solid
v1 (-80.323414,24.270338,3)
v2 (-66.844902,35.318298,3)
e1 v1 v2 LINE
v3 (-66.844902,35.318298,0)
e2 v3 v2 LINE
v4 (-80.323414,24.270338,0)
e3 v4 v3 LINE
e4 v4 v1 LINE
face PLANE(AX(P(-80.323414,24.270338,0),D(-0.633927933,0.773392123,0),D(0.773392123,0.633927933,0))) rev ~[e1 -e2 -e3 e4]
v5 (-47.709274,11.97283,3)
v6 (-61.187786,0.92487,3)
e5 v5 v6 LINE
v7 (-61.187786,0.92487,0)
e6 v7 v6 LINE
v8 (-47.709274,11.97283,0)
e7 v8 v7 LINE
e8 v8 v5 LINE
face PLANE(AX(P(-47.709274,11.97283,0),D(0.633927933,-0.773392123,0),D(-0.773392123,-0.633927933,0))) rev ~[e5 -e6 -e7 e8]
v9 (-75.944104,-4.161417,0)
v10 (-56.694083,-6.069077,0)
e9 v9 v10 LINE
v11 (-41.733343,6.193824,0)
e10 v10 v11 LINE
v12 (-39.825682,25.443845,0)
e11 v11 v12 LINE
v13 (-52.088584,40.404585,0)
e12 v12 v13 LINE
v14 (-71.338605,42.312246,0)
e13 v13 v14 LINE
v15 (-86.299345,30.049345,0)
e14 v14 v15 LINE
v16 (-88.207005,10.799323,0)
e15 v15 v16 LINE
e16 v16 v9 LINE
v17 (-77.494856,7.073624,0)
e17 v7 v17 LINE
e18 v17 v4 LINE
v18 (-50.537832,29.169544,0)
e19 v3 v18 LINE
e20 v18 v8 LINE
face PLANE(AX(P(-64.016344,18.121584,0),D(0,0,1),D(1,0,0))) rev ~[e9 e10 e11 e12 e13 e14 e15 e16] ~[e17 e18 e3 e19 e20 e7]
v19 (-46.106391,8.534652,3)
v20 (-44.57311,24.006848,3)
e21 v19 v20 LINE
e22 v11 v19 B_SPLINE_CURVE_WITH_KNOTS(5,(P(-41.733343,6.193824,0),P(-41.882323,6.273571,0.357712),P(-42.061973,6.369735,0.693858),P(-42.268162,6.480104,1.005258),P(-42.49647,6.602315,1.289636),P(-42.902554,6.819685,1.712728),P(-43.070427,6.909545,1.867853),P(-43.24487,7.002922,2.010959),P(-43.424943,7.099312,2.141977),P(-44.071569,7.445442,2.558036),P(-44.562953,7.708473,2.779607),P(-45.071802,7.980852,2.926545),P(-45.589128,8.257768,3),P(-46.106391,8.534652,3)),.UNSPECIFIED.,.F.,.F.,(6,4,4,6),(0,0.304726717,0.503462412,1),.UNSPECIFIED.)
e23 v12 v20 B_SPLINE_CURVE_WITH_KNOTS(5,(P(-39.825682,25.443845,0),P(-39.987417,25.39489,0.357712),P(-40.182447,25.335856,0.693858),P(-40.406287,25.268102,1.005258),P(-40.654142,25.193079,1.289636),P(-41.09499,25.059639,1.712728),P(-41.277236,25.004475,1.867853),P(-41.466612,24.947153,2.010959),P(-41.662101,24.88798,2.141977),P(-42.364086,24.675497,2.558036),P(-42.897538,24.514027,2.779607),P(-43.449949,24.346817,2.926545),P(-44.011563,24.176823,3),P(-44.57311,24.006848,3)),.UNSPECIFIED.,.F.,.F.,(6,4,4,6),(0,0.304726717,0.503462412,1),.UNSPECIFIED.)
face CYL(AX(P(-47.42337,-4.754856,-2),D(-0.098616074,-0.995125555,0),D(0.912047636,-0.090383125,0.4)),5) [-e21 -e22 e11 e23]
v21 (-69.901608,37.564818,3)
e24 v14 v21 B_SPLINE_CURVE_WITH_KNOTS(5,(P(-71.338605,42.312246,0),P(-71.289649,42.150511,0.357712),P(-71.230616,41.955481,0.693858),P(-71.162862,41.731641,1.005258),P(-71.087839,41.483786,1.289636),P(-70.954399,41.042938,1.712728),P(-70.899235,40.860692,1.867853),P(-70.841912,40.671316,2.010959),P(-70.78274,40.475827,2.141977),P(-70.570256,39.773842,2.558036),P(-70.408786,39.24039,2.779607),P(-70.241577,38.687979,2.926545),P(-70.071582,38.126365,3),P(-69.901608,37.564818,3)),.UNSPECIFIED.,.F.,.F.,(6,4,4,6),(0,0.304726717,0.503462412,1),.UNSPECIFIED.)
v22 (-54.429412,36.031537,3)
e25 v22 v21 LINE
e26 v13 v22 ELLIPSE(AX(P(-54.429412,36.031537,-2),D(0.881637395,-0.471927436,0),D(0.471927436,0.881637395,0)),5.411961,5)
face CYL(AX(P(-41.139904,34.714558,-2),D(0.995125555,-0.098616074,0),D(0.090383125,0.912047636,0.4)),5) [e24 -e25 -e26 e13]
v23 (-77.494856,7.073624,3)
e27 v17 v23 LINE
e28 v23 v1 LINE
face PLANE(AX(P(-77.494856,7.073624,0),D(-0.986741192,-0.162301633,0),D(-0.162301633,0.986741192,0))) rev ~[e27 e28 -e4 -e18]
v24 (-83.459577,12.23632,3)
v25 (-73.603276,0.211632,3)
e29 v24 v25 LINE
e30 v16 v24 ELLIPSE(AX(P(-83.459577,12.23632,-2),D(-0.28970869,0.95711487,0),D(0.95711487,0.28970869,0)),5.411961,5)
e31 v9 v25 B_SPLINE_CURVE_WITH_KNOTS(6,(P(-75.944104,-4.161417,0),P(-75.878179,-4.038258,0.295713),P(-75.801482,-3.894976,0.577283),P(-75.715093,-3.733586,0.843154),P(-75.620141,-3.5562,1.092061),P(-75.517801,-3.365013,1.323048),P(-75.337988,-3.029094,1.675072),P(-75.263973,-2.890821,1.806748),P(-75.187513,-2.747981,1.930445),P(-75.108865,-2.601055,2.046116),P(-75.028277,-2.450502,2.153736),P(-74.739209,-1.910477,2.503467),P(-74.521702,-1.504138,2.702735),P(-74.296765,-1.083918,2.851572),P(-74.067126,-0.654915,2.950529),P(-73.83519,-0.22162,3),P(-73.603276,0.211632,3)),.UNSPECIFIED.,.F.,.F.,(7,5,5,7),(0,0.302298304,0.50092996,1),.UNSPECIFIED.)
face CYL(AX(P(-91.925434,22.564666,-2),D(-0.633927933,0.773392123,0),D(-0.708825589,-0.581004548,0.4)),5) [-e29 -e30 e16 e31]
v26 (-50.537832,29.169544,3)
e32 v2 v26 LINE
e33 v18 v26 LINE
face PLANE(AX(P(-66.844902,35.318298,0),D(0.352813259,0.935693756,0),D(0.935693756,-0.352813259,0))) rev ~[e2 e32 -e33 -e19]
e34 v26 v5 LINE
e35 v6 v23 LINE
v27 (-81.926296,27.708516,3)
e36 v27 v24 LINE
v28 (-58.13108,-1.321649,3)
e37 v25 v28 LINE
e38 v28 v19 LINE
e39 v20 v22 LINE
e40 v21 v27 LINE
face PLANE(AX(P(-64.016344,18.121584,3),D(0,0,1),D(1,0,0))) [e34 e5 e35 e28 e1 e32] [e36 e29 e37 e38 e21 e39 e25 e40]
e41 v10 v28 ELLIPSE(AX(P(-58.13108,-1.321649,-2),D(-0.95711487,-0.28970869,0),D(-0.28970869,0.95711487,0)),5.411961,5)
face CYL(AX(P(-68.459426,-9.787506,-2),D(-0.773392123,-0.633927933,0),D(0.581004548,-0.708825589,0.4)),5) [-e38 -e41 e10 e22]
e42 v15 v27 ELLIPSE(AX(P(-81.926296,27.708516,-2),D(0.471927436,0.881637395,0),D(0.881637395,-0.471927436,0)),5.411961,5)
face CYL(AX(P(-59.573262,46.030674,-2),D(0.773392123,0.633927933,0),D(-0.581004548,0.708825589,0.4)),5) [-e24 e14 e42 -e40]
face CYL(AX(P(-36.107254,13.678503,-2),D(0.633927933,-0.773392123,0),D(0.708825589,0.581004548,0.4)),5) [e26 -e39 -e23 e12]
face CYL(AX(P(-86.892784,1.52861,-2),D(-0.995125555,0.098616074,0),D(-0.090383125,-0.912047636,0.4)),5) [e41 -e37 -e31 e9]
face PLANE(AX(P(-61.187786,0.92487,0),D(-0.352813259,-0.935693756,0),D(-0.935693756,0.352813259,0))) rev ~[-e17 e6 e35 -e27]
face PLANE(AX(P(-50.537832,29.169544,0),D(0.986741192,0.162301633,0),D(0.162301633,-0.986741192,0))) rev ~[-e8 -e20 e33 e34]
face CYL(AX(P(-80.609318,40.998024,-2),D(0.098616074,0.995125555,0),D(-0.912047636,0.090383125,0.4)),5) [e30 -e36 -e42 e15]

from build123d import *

# Parameters (mm, degrees)
F1_DEPTH     = 3
F2_T1_DEPTH  = 42.25719254
F2_T3_DEPTH  = 42.25719254
F2_T5_DEPTH  = 42.25719254
F2_T7_DEPTH  = 42.25719254
F2_T9_DEPTH  = 42.25719254
F2_T11_DEPTH = 42.25719254
F2_T13_DEPTH = 42.25719254
F2_T15_DEPTH = 42.25719254


# Not quite as in the source:
# - a fillet or chamfer that OpenCascade refuses, or shapes differently, is made with other operations: its cross-section is extruded or revolved along the edge and cut away or added


with BuildPart() as f1:
    # F0 (on Top) → F1 (new body)
    with BuildSketch(Plane.XY):
        Polygon((-56.6940829158, -6.0690771788), (-41.7333427947, 6.1938238515), (-39.825682479, 25.4438451183), (-52.0885835093, 40.4045852394), (-71.3386047761, 42.3122455551), (-86.2993448973, 30.0493445247), (-88.2070052129, 10.7993232579), (-75.9441041826, -4.1614168632), align=None)
        Polygon((-77.4948558278, 7.0736241854), (-80.3234138592, 24.2703379682), (-66.8449018774, 35.318297971), (-50.5378318641, 29.1695441909), (-47.7092738327, 11.972830408), (-61.1877858145, 0.9248704053), align=None, mode=Mode.SUBTRACT)
    extrude(amount=F1_DEPTH)

    # F2: fillet of radius 5 on 8 edges, made by hand

    # F2_s2 → F2_t1 (cut)
    with BuildSketch(Plane(origin=(-44.1465389595, 4.3748835016, 0), x_dir=(0, 0, 1), z_dir=(-0.9951255548, 0.0986160744, 0))):
        with BuildLine():
            ThreePointArc((0, 35.0708636755), (2.1833001327, 33.2269007681), (3, 30.4882879806))
            Line((3, 30.4882879806), (3, 35.0708636755))
            Line((3, 35.0708636755), (0, 35.0708636755))
        make_face()
    extrude(amount=F2_T1_DEPTH, mode=Mode.SUBTRACT)

    # F2_s4 → F2_t3 (cut)
    with BuildSketch(Plane(origin=(-13.0651926295, -10.709173668, 0), x_dir=(0, 0, 1), z_dir=(-0.7733921229, -0.633927933, 0))):
        with BuildLine():
            ThreePointArc((0, 77.9474916828), (2.1833001327, 76.1035287753), (3, 73.3649159878))
            Line((3, 73.3649159878), (3, 77.9474916828))
            Line((3, 77.9474916828), (0, 77.9474916828))
        make_face()
    extrude(amount=F2_T3_DEPTH, mode=Mode.SUBTRACT)

    # F2_s6 → F2_t5 (cut)
    with BuildSketch(Plane(origin=(3.2394204217, 32.6886875499, 0), x_dir=(0, 0, 1), z_dir=(-0.0986160744, -0.9951255548, 0))):
        with BuildLine():
            ThreePointArc((0, 88.8420318681), (2.1833001327, 86.9980689606), (3, 84.2594561731))
            Line((3, 84.2594561731), (3, 88.8420318681))
            Line((3, 88.8420318681), (0, 88.8420318681))
        make_face()
    extrude(amount=F2_T5_DEPTH, mode=Mode.SUBTRACT)

    # F2_s8 → F2_t7 (cut)
    with BuildSketch(Plane(origin=(-48.0044686533, 58.5654551398, 0), x_dir=(0, 0, 1), z_dir=(0.633927933, -0.7733921229, 0))):
        with BuildLine():
            ThreePointArc((0, 61.3726103468), (2.1833001327, 59.5286474393), (3, 56.7900346518))
            Line((3, 56.7900346518), (3, 61.3726103468))
            Line((3, 61.3726103468), (0, 61.3726103468))
        make_face()
    extrude(amount=F2_T7_DEPTH, mode=Mode.SUBTRACT)

    # F2_s10 → F2_t9 (cut)
    with BuildSketch(Plane(origin=(-86.1977511311, 8.5421219464, 0), x_dir=(0, 0, 1), z_dir=(0.9951255548, -0.0986160744, 0))):
        with BuildLine():
            ThreePointArc((0, 11.6304416954), (2.1833001327, 9.786478788), (3, 7.0478660005))
            Line((3, 7.0478660005), (3, 11.6304416954))
            Line((3, 11.6304416954), (0, 11.6304416954))
        make_face()
    extrude(amount=F2_T9_DEPTH, mode=Mode.SUBTRACT)

    # F2_s12 → F2_t11 (cut)
    with BuildSketch(Plane(origin=(-45.7465724763, -37.4971883885, 0), x_dir=(0, 0, 1), z_dir=(0.7733921229, 0.633927933, 0))):
        with BuildLine():
            ThreePointArc((0, -31.2461863118), (2.1833001327, -33.0901492192), (3, -35.8287620068))
            Line((3, -35.8287620068), (3, -31.2461863118))
            Line((3, -31.2461863118), (0, -31.2461863118))
        make_face()
    extrude(amount=F2_T11_DEPTH, mode=Mode.SUBTRACT)

    # F2_s14 → F2_t13 (cut)
    with BuildSketch(Plane(origin=(-0.927818023, -9.3625246217, 0), x_dir=(0, 0, 1), z_dir=(0.0986160744, 0.9951255548, 0))):
        with BuildLine():
            ThreePointArc((0, -42.1407264971), (2.1833001327, -43.9846894046), (3, -46.7233021921))
            Line((3, -46.7233021921), (3, -42.1407264971))
            Line((3, -42.1407264971), (0, -42.1407264971))
        make_face()
    extrude(amount=F2_T13_DEPTH, mode=Mode.SUBTRACT)

    # F2_s16 → F2_t15 (cut)
    with BuildSketch(Plane(origin=(-21.2164539328, 25.884075293, 0), x_dir=(0, 0, 1), z_dir=(-0.633927933, 0.7733921229, 0))):
        with BuildLine():
            ThreePointArc((0, -14.6713049758), (2.1833001327, -16.5152678832), (3, -19.2538806708))
            Line((3, -19.2538806708), (3, -14.6713049758))
            Line((3, -14.6713049758), (0, -14.6713049758))
        make_face()
    extrude(amount=F2_T15_DEPTH, mode=Mode.SUBTRACT)


solid = f1.part
